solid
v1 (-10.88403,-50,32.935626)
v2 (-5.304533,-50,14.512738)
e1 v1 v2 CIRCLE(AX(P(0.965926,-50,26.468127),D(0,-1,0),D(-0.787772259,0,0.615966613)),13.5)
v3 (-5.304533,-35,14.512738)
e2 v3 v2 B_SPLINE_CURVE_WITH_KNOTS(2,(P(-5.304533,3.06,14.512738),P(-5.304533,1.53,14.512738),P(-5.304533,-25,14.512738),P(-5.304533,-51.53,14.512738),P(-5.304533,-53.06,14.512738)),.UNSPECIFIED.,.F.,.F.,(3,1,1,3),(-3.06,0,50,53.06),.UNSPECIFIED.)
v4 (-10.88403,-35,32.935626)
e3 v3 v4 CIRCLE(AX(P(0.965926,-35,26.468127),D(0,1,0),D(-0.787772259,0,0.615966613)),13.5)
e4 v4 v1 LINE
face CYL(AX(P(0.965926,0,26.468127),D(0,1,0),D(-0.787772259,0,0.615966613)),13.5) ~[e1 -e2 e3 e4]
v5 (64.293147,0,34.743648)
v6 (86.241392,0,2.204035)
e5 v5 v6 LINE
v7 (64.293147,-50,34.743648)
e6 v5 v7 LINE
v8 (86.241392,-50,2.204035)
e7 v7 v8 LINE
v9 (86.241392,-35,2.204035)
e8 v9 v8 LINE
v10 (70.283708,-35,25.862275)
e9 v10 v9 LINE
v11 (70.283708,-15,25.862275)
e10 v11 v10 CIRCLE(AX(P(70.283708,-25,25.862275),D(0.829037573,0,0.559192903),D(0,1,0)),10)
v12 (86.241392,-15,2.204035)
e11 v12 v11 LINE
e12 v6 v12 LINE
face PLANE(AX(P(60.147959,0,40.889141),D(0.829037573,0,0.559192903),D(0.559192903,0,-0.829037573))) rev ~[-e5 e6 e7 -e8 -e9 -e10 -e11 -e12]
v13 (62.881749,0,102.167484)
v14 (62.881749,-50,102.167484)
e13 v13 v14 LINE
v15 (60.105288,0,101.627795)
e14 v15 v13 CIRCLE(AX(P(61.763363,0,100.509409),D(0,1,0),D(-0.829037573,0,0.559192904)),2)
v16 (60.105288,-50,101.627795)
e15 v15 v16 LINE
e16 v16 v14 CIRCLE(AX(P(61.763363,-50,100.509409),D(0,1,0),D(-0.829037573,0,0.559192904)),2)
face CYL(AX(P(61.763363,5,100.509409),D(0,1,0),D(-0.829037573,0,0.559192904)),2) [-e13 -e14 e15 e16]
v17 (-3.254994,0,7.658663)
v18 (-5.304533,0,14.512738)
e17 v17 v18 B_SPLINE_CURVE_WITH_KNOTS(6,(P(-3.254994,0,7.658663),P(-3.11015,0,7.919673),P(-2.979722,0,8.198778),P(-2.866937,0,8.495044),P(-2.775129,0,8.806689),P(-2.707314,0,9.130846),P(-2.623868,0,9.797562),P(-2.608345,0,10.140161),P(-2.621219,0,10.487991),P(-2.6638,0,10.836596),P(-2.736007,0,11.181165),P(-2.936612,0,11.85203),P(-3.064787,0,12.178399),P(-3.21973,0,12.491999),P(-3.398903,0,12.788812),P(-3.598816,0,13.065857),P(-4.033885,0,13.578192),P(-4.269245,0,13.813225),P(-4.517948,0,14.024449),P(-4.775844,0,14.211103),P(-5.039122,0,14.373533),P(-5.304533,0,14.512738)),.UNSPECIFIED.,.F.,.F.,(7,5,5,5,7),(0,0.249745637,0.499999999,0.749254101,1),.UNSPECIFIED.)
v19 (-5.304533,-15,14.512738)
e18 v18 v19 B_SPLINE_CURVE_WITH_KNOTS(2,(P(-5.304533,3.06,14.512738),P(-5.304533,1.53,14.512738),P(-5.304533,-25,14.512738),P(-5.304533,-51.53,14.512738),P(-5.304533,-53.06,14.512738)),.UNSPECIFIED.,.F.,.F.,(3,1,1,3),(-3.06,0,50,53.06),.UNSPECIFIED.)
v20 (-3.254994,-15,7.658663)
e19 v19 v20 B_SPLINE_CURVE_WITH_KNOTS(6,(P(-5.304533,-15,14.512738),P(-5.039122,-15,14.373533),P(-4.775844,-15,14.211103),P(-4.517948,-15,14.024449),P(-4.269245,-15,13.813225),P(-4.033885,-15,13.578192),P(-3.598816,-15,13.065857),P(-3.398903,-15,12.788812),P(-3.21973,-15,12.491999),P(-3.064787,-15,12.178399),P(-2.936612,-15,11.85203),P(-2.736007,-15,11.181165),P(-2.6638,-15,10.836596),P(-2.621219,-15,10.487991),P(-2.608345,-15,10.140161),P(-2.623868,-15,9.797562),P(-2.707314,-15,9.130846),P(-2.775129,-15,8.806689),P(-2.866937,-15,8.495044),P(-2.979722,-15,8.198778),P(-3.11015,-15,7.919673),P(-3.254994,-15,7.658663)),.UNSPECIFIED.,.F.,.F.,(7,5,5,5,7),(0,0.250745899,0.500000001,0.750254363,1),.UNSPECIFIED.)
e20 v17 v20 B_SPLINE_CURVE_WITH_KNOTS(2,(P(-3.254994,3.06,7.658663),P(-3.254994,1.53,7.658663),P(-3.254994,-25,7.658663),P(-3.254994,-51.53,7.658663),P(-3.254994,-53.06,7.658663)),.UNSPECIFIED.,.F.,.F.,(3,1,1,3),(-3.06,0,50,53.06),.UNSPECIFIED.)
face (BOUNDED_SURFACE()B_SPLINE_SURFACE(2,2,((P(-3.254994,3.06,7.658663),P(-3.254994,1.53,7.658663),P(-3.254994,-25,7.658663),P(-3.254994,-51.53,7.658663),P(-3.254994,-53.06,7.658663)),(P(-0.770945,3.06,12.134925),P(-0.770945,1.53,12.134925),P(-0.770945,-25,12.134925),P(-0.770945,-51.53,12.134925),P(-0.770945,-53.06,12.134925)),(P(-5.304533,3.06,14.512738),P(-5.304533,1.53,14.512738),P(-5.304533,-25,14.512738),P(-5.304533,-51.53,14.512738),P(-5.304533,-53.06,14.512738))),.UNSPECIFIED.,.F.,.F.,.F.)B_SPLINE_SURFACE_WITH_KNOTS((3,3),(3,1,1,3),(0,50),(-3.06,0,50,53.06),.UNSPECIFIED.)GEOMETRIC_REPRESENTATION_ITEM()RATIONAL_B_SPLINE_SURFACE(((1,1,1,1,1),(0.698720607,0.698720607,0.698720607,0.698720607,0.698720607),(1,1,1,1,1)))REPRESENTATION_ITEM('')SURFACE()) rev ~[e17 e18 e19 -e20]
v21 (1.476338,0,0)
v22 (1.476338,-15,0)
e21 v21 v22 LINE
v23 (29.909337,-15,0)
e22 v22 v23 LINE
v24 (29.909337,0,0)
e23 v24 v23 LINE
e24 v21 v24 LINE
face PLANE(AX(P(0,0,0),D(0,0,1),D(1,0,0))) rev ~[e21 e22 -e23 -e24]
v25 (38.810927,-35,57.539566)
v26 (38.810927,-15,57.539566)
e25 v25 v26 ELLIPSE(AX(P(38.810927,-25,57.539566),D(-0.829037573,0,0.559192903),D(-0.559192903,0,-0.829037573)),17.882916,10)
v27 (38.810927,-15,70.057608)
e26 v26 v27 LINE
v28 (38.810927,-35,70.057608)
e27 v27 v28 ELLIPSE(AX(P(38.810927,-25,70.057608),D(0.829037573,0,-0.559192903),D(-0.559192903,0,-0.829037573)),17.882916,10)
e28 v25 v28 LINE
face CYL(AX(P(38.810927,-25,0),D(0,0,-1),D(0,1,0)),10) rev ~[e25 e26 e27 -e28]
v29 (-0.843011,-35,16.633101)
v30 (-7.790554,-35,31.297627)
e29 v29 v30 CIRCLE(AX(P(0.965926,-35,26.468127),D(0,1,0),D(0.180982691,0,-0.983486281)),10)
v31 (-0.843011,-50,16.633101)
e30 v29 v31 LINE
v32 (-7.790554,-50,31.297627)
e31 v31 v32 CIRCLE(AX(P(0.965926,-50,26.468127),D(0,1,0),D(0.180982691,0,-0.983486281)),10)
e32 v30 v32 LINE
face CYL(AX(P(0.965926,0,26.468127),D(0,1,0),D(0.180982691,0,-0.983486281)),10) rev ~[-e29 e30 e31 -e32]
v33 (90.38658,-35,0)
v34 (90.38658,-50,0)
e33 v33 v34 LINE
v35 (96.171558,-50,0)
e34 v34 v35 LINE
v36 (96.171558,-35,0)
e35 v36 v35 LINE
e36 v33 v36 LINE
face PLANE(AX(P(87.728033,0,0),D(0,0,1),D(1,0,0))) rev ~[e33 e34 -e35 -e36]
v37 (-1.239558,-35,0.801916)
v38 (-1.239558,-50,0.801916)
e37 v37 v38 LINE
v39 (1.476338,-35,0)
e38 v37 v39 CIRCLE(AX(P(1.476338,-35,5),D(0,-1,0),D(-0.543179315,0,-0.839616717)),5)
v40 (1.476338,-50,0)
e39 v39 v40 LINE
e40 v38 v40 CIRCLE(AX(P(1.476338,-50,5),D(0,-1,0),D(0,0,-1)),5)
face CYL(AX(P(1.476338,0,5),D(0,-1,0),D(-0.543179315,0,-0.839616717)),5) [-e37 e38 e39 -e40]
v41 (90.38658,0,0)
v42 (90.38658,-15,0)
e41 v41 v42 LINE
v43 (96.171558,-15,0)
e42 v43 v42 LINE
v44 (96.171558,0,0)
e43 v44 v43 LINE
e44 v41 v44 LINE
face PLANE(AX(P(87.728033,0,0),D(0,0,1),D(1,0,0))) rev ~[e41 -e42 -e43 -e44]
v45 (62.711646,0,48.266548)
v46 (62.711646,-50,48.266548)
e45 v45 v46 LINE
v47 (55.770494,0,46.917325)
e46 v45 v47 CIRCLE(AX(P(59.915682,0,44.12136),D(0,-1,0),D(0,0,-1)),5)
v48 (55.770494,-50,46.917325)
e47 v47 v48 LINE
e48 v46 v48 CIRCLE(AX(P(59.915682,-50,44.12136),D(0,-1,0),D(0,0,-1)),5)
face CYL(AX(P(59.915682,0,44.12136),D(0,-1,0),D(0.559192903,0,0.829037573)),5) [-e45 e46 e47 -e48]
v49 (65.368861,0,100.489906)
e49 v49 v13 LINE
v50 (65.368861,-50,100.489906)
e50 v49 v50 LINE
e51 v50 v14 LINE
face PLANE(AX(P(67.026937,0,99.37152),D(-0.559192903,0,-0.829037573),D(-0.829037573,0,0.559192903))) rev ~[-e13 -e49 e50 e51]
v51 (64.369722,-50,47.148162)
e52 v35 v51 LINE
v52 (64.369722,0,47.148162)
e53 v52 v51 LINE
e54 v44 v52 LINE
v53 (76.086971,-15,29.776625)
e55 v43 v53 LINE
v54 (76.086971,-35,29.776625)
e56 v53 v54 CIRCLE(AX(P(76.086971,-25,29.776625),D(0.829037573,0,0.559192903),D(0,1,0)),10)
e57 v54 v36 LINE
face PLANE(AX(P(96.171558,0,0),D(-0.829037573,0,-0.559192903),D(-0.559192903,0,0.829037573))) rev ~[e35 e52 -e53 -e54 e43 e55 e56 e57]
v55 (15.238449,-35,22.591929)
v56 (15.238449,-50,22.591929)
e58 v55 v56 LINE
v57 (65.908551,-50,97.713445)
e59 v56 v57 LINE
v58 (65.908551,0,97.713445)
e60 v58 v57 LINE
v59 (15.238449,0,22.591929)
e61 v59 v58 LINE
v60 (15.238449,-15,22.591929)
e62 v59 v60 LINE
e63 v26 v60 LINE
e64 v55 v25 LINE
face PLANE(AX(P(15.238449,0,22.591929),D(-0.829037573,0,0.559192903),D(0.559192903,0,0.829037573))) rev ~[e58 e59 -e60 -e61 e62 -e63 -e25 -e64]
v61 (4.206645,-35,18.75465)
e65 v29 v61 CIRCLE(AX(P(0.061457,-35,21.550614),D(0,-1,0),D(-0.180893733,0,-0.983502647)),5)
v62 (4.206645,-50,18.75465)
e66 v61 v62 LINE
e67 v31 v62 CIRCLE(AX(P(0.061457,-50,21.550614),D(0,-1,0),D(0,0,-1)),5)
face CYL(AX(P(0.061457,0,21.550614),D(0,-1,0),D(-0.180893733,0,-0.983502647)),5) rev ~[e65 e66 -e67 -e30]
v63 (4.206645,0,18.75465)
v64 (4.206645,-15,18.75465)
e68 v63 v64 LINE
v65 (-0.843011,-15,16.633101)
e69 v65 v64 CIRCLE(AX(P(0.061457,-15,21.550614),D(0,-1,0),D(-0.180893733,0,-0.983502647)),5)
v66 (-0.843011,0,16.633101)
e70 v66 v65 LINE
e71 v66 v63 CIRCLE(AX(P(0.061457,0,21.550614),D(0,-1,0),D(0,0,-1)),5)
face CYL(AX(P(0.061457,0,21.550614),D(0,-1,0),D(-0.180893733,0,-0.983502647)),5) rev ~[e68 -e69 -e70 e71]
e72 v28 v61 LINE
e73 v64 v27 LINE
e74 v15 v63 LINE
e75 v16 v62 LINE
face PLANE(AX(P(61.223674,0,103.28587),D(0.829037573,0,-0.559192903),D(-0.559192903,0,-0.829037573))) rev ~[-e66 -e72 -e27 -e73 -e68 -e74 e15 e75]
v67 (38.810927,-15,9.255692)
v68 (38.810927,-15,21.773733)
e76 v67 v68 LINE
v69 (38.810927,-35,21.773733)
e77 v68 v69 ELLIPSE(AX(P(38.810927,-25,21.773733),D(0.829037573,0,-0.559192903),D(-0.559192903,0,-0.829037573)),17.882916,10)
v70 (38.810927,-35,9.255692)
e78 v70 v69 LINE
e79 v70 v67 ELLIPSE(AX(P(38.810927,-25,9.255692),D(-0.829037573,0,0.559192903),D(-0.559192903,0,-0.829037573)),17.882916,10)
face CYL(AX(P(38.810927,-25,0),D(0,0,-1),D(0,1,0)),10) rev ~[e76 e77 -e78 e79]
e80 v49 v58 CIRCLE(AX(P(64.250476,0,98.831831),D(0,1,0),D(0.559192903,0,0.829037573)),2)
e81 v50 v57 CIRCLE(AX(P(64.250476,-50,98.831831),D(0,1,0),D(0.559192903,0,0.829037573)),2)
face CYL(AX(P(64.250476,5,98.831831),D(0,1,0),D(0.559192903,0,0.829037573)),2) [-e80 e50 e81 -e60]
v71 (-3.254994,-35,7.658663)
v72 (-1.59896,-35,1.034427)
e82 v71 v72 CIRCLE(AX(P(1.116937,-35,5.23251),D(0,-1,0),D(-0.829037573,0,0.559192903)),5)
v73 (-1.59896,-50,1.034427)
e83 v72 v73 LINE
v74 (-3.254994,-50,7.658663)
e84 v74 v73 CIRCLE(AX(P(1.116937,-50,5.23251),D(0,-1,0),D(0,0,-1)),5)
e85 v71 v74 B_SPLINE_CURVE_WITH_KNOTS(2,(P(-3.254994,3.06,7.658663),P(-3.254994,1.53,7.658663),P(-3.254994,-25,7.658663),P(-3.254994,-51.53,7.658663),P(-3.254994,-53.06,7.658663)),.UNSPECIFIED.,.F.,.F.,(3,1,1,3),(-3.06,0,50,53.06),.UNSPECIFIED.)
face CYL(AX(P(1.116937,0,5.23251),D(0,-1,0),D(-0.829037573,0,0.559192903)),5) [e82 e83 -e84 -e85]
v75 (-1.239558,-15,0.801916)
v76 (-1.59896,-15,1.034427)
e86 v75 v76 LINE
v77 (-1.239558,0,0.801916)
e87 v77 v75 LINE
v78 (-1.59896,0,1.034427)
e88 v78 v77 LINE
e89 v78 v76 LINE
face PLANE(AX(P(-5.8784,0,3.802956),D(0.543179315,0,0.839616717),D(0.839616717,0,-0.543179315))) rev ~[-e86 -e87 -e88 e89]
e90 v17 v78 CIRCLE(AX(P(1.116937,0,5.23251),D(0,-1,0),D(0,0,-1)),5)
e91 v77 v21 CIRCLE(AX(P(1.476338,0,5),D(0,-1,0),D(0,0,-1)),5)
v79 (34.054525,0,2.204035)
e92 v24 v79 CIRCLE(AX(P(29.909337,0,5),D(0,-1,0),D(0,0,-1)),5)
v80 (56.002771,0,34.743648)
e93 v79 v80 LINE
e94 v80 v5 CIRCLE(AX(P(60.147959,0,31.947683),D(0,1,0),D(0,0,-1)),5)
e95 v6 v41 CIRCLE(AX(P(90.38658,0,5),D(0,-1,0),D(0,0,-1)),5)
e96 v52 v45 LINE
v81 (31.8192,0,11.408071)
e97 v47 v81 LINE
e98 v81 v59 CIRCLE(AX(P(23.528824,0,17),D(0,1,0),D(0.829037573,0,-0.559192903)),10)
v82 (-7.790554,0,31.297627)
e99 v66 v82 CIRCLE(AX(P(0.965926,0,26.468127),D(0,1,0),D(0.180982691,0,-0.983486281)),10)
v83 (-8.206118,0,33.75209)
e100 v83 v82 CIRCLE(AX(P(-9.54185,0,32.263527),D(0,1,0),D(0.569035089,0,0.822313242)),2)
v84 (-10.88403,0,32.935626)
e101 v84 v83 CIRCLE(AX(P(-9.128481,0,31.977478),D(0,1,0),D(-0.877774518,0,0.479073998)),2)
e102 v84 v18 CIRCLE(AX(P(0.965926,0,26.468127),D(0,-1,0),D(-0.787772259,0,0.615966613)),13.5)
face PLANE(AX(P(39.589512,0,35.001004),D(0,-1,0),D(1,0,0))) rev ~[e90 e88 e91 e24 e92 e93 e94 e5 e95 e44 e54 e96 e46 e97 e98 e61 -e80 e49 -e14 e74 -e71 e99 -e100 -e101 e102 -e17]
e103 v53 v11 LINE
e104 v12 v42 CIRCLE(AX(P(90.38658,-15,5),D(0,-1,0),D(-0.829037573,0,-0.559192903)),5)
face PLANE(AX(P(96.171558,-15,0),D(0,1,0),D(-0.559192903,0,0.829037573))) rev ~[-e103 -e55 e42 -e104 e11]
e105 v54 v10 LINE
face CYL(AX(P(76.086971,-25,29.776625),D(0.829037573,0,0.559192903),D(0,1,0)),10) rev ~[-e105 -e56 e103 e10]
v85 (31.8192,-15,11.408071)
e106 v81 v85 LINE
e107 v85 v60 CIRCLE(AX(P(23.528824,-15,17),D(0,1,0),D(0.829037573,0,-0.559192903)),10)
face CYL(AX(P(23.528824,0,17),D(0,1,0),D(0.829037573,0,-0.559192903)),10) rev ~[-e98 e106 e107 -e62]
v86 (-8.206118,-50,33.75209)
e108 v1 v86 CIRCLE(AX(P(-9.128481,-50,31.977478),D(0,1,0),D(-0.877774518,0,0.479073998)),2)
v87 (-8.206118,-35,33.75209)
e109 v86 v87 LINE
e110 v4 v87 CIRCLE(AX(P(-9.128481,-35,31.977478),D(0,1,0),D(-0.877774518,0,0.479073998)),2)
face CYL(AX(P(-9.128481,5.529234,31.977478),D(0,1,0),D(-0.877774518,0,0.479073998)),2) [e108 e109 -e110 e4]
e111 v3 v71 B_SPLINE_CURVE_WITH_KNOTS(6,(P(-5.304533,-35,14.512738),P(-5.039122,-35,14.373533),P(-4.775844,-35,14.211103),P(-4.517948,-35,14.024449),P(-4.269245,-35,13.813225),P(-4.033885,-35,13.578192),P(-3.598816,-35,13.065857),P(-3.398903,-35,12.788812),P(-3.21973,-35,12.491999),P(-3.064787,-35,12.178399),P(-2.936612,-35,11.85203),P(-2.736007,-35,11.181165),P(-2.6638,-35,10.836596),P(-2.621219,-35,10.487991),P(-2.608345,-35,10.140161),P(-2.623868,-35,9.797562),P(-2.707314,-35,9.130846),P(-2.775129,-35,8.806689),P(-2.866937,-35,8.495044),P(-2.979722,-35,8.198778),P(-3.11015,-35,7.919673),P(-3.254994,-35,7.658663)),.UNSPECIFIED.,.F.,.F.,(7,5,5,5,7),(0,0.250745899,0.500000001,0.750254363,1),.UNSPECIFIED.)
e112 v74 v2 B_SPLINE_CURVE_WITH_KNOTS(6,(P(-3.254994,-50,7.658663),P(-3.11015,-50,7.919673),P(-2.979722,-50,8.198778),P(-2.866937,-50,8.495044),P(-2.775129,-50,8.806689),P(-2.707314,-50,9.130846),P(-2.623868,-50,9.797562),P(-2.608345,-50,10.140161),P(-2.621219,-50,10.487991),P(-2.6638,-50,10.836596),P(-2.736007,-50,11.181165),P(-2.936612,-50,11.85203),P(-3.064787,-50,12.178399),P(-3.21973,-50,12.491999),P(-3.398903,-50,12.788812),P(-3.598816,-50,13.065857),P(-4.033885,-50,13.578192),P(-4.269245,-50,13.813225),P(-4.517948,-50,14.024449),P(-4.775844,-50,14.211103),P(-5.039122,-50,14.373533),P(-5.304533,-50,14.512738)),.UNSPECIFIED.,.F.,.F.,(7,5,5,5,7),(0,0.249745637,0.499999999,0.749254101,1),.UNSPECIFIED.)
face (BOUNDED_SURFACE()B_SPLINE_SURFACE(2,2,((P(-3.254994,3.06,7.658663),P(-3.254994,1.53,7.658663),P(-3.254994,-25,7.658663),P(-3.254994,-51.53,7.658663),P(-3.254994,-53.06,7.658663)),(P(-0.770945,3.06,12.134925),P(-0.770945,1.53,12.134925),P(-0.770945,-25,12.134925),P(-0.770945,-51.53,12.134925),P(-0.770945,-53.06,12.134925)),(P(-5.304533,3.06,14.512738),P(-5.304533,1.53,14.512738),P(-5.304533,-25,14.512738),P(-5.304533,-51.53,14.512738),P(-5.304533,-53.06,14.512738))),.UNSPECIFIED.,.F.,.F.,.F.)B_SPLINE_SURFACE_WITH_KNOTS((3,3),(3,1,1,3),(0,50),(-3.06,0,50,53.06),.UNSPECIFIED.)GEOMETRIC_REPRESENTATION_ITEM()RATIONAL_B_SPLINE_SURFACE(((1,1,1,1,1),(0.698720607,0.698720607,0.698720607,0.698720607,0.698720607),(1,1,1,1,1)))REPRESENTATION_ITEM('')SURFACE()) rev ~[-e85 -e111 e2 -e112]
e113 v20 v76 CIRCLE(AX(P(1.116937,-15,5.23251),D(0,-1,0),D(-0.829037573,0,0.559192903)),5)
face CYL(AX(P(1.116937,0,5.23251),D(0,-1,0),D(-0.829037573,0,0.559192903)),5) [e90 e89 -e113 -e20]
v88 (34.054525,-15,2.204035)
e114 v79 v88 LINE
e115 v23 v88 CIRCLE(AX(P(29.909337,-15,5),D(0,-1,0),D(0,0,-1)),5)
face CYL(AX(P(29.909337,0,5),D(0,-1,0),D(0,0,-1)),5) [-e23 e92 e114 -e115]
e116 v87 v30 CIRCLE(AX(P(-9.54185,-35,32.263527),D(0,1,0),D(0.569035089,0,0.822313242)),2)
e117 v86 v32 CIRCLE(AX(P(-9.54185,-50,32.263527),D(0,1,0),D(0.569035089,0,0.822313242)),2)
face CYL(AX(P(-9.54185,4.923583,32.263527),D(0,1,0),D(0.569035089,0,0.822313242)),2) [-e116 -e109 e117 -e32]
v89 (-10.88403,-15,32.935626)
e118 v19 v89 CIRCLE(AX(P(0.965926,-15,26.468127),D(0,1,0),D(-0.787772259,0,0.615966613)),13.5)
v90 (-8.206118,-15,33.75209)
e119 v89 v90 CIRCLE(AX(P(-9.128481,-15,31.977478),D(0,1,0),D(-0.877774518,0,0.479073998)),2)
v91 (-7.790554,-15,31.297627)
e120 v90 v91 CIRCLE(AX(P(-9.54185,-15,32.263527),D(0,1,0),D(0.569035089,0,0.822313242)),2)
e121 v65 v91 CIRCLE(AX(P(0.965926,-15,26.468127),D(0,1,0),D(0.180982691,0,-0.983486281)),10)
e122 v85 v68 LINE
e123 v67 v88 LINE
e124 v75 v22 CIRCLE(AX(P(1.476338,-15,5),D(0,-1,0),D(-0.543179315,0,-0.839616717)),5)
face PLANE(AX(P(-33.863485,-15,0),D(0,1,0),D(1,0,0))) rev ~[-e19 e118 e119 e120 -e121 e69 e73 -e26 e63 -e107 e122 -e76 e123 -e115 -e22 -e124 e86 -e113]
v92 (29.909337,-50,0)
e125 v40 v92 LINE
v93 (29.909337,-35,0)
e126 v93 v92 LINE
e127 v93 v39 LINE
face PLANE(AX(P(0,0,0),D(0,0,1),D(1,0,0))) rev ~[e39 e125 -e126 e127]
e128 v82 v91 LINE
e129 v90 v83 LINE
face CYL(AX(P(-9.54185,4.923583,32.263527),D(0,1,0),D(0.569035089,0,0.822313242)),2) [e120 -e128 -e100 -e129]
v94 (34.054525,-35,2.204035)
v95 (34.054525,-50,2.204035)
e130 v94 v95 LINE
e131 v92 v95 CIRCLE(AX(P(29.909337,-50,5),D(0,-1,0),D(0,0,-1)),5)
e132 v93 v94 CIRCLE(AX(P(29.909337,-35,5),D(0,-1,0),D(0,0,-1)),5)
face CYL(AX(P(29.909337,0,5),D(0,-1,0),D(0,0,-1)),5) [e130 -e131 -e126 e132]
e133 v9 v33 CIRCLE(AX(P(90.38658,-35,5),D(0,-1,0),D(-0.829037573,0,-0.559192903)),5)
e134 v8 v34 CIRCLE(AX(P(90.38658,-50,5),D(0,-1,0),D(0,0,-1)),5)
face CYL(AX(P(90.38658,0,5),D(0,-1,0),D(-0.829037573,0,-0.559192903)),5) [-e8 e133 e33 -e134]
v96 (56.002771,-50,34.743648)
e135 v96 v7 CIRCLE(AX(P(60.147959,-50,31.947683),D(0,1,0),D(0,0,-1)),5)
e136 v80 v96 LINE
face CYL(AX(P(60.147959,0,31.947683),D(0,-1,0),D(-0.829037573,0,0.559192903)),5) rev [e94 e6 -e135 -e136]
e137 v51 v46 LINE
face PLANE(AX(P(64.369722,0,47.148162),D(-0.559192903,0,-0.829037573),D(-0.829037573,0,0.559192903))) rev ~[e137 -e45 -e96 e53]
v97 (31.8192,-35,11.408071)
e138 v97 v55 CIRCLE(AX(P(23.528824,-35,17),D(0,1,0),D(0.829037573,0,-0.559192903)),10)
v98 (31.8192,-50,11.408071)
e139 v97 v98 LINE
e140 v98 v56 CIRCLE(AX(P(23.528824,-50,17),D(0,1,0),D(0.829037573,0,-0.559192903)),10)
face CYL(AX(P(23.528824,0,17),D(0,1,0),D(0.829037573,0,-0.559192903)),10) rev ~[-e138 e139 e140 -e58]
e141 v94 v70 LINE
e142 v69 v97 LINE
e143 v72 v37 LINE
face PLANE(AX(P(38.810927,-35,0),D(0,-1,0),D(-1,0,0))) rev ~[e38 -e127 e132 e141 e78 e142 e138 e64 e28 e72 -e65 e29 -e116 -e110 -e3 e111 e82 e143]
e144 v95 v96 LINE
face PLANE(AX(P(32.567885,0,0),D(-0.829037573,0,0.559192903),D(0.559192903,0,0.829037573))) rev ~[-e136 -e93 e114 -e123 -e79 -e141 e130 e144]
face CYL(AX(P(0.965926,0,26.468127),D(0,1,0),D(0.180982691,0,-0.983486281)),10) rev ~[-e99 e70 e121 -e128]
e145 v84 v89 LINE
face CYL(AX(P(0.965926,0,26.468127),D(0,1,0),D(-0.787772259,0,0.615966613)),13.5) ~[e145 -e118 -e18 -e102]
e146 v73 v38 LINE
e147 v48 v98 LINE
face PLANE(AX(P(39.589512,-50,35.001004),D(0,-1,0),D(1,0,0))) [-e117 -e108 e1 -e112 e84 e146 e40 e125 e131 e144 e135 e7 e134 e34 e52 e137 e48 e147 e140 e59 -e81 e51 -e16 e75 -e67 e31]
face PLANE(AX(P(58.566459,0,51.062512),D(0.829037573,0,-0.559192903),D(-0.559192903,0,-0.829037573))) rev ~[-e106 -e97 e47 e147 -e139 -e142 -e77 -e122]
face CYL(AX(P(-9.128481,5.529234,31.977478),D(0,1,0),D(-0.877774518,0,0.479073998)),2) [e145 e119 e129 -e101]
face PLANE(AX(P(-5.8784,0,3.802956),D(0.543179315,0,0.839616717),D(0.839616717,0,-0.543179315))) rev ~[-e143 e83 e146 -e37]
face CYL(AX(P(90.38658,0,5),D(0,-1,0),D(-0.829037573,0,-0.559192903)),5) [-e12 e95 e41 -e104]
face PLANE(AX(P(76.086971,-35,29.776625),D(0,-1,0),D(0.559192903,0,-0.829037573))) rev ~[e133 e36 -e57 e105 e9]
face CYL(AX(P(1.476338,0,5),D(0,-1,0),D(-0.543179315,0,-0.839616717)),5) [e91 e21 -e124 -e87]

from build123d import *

# Parameters (mm, degrees)
F1_DEPTH    = 50
F2_R        = 5
F3_T1_DEPTH = 61.0584684806
F3_T3_DEPTH = 59.847165152
F3_T5_DEPTH = 60
F4_R        = 5
F5_W        = 35.3398231359
F5_H        = 20
F5_W_2      = 28.4329991749
F6_DEPTH    = 102.5
F8_DEPTH    = 25


# Not quite as in the source:
# - a fillet or chamfer that OpenCascade refuses, or shapes differently, is made with other operations: its cross-section is extruded or revolved along the edge and cut away or added


with BuildPart() as f1:
    # F0 (on Front) → F1 (new body)
    with BuildSketch(Plane.XZ):
        with BuildLine():
            ThreePointArc((31.8191999969, 11.4080709653), (17.9368952367, 8.7096242744), (15.2384485458, 22.5919290347))
            Line((15.2384485458, 22.5919290347), (67.0269365518, 99.3715199707))
            Line((67.0269365518, 99.3715199707), (61.2236735439, 103.285870295))
            Line((61.2236735439, 103.285870295), (2.7757529523, 16.6332645351))
            ThreePointArc((2.7757529523, 16.6332645351), (-7.6399843, 21.3751609063), (-6.7842885115, 32.7874765531))
            Line((-6.7842885115, 32.7874765531), (-9.6689994545, 34.7836766193))
            ThreePointArc((-9.6689994545, 34.7836766193), (-11.3082346995, 20.8471863165), (0.3142037122, 12.9838677097))
            Line((0.3142037122, 12.9838677097), (-5.8783996854, 3.8029556189))
            Line((-5.8783996854, 3.8029556189), (0, 0))
            Line((0, 0), (32.5678846096, 0))
            Line((32.5678846096, 0), (60.1479586957, 40.8891413488))
            Line((60.1479586957, 40.8891413488), (87.7280327819, 0))
            Line((87.7280327819, 0), (96.1715584214, 0))
            Line((96.1715584214, 0), (64.3697215155, 47.1481621237))
            Line((64.3697215155, 47.1481621237), (58.5664585076, 51.062512448))
            Line((58.5664585076, 51.062512448), (31.8191999969, 11.4080709653))
        make_face()
    extrude(amount=F1_DEPTH)

    # F2
    f2_edges = [f1.edges().sort_by_distance(p)[0] for p in [
        (58.566459, -25, 51.062512),
        (60.147959, -25, 40.889141),
        (32.567885, -25, 0),
        (87.728033, -25, 0),
        (0, -25, 0),
        (-5.8784, -25, 3.802956),
    ]]
    fillet(f2_edges, radius=F2_R)

    # F3: fillet of radius 2 on 4 edges, made by hand

    # F3_s2 → F3_t1 (cut)
    with BuildSketch(Plane.XZ.offset(-5.5292342403)):
        with BuildLine():
            ThreePointArc((-10.8840299501, 32.9356263223), (-9.5901444427, 33.9234656813), (-7.9904107365, 33.6221048098))
            Line((-7.9904107365, 33.6221048098), (-9.6689994545, 34.7836766193))
            ThreePointArc((-9.6689994545, 34.7836766193), (-10.3144239688, 33.8845755298), (-10.8840299501, 32.9356263223))
        make_face()
    extrude(amount=F3_T1_DEPTH, mode=Mode.SUBTRACT)

    # F3_s4 → F3_t3 (cut)
    with BuildSketch(Plane.XZ.offset(-4.923582576)):
        with BuildLine():
            ThreePointArc((-8.4037793712, 33.9081530525), (-7.5948464442, 32.7208873787), (-7.790553617, 31.2976266988))
            ThreePointArc((-7.790553617, 31.2976266988), (-7.3209703374, 32.065211267), (-6.7842885115, 32.7874765531))
            Line((-6.7842885115, 32.7874765531), (-8.4037793712, 33.9081530525))
        make_face()
    extrude(amount=F3_T3_DEPTH, mode=Mode.SUBTRACT)

    # F3_s6 → F3_t5 (cut)
    with BuildSketch(Plane.XZ.offset(-5)):
        with BuildLine():
            ThreePointArc((60.105287737, 101.6277951499), (61.3817448913, 102.4726637098), (62.881748689, 102.1674844881))
            Line((62.881748689, 102.1674844881), (61.2236735439, 103.285870295))
            Line((61.2236735439, 103.285870295), (60.105287737, 101.6277951499))
        make_face()
        with BuildLine():
            ThreePointArc((65.3688614067, 100.4899057776), (66.2137299667, 99.2134486233), (65.9085507449, 97.7134448256))
            Line((65.9085507449, 97.7134448256), (67.0269365518, 99.3715199707))
            Line((67.0269365518, 99.3715199707), (65.3688614067, 100.4899057776))
        make_face()
    extrude(amount=F3_T5_DEPTH, mode=Mode.SUBTRACT)

    # F4
    f4_edges = [f1.edges().sort_by_distance(p)[0] for p in [
        (2.775753, -25, 16.633265),
        (0.314204, -25, 12.983868),
    ]]
    fillet(f4_edges, radius=F4_R)

    # F5 (on face) → F6 (cut)
    with BuildSketch(Plane(origin=(0, 0, 0), x_dir=(1, 0, 0), z_dir=(0, 0, -1))):
        with Locations((-16.1935732915, 25)):
            Rectangle(F5_W, F5_H)
        with Locations((15.6928378639, 25)):
            Rectangle(F5_W_2, F5_H)
        with BuildLine():
            Line((29.9093374513, 15), (38.8109274209, 15))
            ThreePointArc((38.8109274209, 15), (48.8109274209, 25), (38.8109274209, 35))
            Line((38.8109274209, 35), (29.9093374513, 35))
            Line((29.9093374513, 35), (29.9093374513, 15))
        make_face()
    extrude(amount=-F6_DEPTH, mode=Mode.SUBTRACT)

    # F7 (on face) → F8 (cut)
    with BuildSketch(Plane(origin=(66.0990291526, 0, 44.5843581184), x_dir=(0, 1, 0), z_dir=(0.8290375726, 0, 0.5591929035))):
        with BuildLine():
            Line((-15, -53.778452985), (-15, -17.8613532335))
            ThreePointArc((-15, -17.8613532335), (-25, -7.8613532335), (-35, -17.8613532335))
            Line((-35, -17.8613532335), (-35, -53.778452985))
            Line((-35, -53.778452985), (-15, -53.778452985))
        make_face()
    extrude(amount=-F8_DEPTH, mode=Mode.SUBTRACT)


solid = f1.part
